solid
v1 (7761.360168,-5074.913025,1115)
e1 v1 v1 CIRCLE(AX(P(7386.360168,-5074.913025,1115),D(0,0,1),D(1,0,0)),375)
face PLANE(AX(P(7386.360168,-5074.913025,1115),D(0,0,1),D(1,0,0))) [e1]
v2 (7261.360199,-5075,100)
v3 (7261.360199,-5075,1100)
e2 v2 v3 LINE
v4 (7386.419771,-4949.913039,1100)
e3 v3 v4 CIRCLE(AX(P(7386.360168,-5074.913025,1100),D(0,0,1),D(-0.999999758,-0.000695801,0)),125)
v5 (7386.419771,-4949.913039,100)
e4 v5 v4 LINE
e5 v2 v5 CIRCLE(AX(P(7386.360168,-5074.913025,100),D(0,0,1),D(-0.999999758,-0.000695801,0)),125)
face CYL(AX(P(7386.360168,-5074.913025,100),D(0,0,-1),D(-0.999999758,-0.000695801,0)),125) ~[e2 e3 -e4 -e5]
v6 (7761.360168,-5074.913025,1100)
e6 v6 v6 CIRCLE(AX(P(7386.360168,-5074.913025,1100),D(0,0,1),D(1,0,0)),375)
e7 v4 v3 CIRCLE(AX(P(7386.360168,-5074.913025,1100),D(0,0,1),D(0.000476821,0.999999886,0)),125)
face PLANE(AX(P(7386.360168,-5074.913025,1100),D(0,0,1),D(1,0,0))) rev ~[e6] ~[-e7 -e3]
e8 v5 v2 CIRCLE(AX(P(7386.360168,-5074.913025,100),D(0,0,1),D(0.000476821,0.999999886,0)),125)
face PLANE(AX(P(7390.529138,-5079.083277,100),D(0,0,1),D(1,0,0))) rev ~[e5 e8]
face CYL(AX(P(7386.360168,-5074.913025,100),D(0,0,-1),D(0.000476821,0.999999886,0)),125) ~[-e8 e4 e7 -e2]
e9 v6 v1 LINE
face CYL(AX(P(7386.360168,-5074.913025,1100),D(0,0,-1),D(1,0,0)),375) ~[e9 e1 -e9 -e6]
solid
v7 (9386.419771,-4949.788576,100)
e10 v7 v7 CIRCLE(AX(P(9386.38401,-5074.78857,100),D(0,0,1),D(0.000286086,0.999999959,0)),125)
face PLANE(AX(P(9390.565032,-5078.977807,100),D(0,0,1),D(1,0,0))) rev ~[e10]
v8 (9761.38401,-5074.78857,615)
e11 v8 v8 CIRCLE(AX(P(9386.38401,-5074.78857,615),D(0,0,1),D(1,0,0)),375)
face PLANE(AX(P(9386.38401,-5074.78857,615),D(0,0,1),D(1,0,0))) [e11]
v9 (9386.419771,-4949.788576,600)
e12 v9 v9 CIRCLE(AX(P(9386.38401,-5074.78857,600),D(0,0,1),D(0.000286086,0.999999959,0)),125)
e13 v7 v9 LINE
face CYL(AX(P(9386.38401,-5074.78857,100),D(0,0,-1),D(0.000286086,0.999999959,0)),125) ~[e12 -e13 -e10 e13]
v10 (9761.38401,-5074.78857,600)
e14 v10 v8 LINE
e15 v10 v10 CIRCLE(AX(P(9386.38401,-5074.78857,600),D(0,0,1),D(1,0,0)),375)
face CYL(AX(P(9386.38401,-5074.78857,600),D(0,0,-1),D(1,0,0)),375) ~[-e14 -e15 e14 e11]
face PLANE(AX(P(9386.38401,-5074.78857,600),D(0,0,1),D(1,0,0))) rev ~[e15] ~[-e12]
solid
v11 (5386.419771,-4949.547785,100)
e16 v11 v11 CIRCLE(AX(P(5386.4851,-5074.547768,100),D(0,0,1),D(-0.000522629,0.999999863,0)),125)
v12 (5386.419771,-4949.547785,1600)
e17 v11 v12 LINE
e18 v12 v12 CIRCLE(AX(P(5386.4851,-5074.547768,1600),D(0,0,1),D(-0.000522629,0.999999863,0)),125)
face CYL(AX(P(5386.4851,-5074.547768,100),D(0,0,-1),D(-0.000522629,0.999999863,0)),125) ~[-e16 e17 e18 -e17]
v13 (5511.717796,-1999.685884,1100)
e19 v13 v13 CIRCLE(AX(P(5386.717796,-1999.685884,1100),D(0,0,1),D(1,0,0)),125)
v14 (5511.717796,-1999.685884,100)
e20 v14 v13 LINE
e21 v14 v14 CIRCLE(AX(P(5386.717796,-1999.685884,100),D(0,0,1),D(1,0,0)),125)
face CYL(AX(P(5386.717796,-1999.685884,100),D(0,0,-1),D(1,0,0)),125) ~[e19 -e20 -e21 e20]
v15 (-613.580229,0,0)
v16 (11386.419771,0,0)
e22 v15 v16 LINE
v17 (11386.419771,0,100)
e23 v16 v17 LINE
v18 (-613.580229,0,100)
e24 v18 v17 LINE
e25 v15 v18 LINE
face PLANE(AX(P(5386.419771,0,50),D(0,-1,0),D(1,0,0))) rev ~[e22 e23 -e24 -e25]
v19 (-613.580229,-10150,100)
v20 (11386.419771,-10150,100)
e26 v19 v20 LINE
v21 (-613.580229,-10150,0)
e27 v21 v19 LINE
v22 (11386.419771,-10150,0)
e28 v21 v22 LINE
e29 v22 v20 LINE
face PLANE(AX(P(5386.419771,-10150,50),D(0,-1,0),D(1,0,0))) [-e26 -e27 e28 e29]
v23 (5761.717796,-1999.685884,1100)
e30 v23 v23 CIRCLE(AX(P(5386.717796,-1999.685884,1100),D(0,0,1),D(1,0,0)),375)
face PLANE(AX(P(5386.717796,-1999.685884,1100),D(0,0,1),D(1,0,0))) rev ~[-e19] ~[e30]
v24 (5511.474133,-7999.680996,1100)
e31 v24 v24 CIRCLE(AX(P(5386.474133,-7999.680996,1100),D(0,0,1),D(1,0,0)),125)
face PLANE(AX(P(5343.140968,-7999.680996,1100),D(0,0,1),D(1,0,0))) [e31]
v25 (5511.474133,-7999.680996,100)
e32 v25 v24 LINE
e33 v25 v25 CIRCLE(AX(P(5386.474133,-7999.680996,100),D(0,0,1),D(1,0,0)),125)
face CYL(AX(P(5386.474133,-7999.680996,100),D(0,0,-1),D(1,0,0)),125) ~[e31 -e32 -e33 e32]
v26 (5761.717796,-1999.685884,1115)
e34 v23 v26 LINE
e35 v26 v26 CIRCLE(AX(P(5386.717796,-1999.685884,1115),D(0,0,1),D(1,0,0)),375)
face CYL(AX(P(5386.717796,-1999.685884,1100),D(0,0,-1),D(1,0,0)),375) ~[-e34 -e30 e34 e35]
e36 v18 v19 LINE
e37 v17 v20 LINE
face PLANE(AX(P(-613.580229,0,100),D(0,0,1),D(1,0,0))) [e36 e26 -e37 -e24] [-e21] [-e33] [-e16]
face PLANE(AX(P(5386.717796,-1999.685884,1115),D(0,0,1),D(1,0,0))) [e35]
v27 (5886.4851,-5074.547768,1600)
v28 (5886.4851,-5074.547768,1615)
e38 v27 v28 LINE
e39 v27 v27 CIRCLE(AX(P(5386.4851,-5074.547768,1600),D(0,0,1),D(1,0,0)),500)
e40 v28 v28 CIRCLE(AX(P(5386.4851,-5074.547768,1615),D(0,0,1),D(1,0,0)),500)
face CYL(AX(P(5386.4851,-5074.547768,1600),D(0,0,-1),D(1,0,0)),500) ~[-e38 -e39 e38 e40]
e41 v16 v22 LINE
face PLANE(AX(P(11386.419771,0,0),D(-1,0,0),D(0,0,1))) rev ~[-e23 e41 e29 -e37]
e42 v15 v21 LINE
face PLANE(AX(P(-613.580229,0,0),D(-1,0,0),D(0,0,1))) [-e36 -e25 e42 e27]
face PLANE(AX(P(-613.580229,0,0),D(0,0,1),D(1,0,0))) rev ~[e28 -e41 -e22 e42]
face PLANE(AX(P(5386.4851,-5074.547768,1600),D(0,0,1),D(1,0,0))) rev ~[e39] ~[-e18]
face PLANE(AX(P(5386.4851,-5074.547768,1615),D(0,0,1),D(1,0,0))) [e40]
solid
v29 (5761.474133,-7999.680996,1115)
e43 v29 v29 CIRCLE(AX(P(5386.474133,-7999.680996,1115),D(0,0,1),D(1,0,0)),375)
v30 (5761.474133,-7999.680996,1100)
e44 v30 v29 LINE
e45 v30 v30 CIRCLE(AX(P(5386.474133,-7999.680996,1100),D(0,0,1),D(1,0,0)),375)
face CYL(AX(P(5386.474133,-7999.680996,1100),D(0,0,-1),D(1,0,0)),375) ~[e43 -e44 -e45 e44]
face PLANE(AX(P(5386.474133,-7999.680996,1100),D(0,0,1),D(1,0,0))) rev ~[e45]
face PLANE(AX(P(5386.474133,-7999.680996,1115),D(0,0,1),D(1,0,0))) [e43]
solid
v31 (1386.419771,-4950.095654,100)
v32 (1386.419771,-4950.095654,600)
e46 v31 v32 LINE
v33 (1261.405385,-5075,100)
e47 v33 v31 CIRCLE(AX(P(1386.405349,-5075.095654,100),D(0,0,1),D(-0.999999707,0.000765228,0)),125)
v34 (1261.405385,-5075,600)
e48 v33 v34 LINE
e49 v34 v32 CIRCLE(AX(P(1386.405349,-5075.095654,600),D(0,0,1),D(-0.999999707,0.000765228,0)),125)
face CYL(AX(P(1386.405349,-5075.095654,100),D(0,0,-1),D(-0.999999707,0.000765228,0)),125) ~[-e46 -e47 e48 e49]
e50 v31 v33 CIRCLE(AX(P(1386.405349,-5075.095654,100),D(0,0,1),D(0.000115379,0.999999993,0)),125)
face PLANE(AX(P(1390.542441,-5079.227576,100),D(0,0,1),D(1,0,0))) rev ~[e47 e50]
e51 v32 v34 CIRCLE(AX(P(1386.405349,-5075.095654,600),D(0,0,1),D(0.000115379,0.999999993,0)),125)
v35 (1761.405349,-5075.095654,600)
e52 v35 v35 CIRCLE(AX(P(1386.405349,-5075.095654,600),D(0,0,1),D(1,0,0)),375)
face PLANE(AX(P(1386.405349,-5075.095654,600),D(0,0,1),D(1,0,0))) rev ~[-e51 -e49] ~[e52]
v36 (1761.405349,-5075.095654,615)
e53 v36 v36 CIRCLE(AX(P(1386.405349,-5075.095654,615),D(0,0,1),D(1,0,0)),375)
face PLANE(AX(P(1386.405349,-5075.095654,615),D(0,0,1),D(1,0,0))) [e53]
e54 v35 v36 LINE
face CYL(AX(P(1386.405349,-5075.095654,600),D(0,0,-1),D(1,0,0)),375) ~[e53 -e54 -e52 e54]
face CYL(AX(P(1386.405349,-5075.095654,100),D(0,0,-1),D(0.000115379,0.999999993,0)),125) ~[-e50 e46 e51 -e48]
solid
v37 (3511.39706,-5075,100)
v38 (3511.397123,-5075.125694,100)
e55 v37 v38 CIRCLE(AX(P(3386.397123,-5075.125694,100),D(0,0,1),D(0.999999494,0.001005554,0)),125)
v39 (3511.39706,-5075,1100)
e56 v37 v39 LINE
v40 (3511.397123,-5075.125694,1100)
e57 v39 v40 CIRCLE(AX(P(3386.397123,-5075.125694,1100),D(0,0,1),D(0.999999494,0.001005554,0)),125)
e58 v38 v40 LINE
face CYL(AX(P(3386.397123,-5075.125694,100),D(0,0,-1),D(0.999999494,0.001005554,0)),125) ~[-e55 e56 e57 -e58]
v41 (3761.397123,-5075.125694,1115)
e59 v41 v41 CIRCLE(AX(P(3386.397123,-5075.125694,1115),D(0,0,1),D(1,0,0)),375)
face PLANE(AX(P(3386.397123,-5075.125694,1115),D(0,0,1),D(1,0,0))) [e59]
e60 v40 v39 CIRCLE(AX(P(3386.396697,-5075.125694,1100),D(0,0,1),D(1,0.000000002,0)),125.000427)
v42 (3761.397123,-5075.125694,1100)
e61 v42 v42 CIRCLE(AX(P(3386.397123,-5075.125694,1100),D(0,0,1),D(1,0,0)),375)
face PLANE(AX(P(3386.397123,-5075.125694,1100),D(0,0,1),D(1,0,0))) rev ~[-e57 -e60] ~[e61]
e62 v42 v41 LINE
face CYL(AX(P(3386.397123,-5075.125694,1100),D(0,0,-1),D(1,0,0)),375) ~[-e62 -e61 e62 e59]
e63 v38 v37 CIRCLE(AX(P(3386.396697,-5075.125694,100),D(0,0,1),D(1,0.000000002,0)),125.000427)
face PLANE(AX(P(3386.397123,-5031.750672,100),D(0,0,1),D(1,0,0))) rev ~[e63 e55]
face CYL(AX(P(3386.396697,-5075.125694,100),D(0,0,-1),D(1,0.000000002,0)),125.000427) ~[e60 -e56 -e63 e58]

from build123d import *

# Parameters (mm, degrees)
F0_W      = 12000
F0_H      = 100
F1_DEPTH  = 10150
F10_DEPTH = 1500
F11_DEPTH = 500
F12_DEPTH = 1000
F16_DEPTH = 1000
F17_R     = 375
F17_R_2   = 125
F18_DEPTH = 15
F19_R     = 500
F19_R_2   = 125
F20_DEPTH = 15
F21_R     = 375
F21_R_2   = 125
F22_DEPTH = 15
F23_R     = 375
F23_R_2   = 125
F24_DEPTH = 15
F25_R     = 375
F26_DEPTH = 15
F27_R     = 375
F27_R_2   = 125
F28_DEPTH = 15
F29_R     = 375
F29_R_2   = 125
F30_DEPTH = 15


with BuildPart() as f1:
    # F0 (on Front) → F1 (new body)
    with BuildSketch(Plane.XZ):
        with Locations((5386.4197711137, 50)):
            Rectangle(F0_W, F0_H)
    extrude(amount=F1_DEPTH)

    # F3 (on face) → F10 (join)
    with BuildSketch(Plane.XY.offset(100)):
        with BuildLine():
            ThreePointArc((5261.4859178516, -5075), (5386.7112163429, -5199.5475631242), (5511.4850997925, -5074.5477676392))
            ThreePointArc((5511.4850997925, -5074.5477676392), (5474.8503472463, -4986.136325832), (5386.4197711137, -4949.5477847105))
            Line((5386.4197711137, -4949.5477847105), (5386.4197711137, -5075))
            Line((5386.4197711137, -5075), (5261.4859178516, -5075))
        make_face()
        with BuildLine():
            Line((5386.4197711137, -5075), (5386.4197711137, -4949.5477847105))
            ThreePointArc((5386.4197711137, -4949.5477847105), (5297.9139558776, -4986.3425950833), (5261.4859178516, -5075))
            Line((5261.4859178516, -5075), (5386.4197711137, -5075))
        make_face()
    extrude(amount=F10_DEPTH)

    # F14 (on face) + F15 (on face) → F16 (join)
    with BuildSketch(Plane.XY.offset(100)):
        with BuildLine():
            Line((5386.4197711137, -2124.6855282454), (5386.4197711137, -1874.6862387986))
            ThreePointArc((5386.4197711137, -1874.6862387986), (5261.7177963257, -1999.685883522), (5386.4197711137, -2124.6855282454))
        make_face()
        with BuildLine():
            ThreePointArc((5386.4197711137, -2124.6855282454), (5475.0007132703, -2088.1795362647), (5511.7177963257, -1999.685883522))
            ThreePointArc((5511.7177963257, -1999.685883522), (5475.0007132703, -1911.1922307793), (5386.4197711137, -1874.6862387986))
            Line((5386.4197711137, -1874.6862387986), (5386.4197711137, -2124.6855282454))
        make_face()
    with BuildSketch(Plane.XY.offset(100)):
        with BuildLine():
            Line((5386.4197711137, -8124.6809841205), (5386.4197711137, -7874.6810077618))
            ThreePointArc((5386.4197711137, -7874.6810077618), (5261.4741325378, -7999.6809959412), (5386.4197711137, -8124.6809841205))
        make_face()
        with BuildLine():
            ThreePointArc((5386.4197711137, -8124.6809841205), (5474.8432584303, -8088.0885611661), (5511.4741325378, -7999.6809959412))
            ThreePointArc((5511.4741325378, -7999.6809959412), (5474.8432584303, -7911.2734307162), (5386.4197711137, -7874.6810077618))
            Line((5386.4197711137, -7874.6810077618), (5386.4197711137, -8124.6809841205))
        make_face()
    extrude(amount=F16_DEPTH)

    # F17 (on face) → F18 (join)
    with BuildSketch(Plane.XY.offset(1100)):
        with Locations((5386.7177963257, -1999.685883522)):
            Circle(F17_R)
        with Locations((5386.7177963257, -1999.685883522)):
            Circle(F17_R_2, mode=Mode.SUBTRACT)
        with Locations((5386.7177963257, -1999.685883522)):
            Circle(F17_R_2)
    extrude(amount=F18_DEPTH)

    # F19 (on face) → F20 (join)
    with BuildSketch(Plane.XY.offset(1600)):
        with Locations((5386.4850997925, -5074.5477676392)):
            Circle(F19_R)
        with Locations((5386.4850997925, -5074.5477676392)):
            Circle(F19_R_2, mode=Mode.SUBTRACT)
        with Locations((5386.4850997925, -5074.5477676392)):
            Circle(F19_R_2)
    extrude(amount=F20_DEPTH)


with BuildPart() as f11:
    # F9 (on face) → F11 (new body)
    with BuildSketch(Plane.XY.offset(100)):
        with BuildLine():
            ThreePointArc((1261.4053853762, -5075), (1386.3575220073, -5200.0956443843), (1511.4053487778, -5075.0956535339))
            ThreePointArc((1511.4053487778, -5075.0956535339), (1474.7987953448, -4986.7124050985), (1386.4197711137, -4950.095654366))
            Line((1386.4197711137, -4950.095654366), (1386.4197711137, -5075))
            Line((1386.4197711137, -5075), (1261.4053853762, -5075))
        make_face()
        with BuildLine():
            Line((1386.4197711137, -5075), (1386.4197711137, -4950.095654366))
            ThreePointArc((1386.4197711137, -4950.095654366), (1298.0559273963, -4986.6683967543), (1261.4053853762, -5075))
            Line((1261.4053853762, -5075), (1386.4197711137, -5075))
        make_face()
    extrude(amount=F11_DEPTH)

    # F23 (on face) → F24 (join)
    with BuildSketch(Plane.XY.offset(600)):
        with Locations((1386.4053487778, -5075.0956535339)):
            Circle(F23_R)
        with Locations((1386.4053487778, -5075.0956535339)):
            Circle(F23_R_2, mode=Mode.SUBTRACT)
        with Locations((1386.4053487778, -5075.0956535339)):
            Circle(F23_R_2)
    extrude(amount=F24_DEPTH)


with BuildPart() as f11b:
    # F7 (on face) → F11, piece 2 (new body)
    with BuildSketch(Plane.XY.offset(100)):
        with BuildLine():
            ThreePointArc((9261.384189125, -5075), (9386.4897251507, -5199.7885257015), (9511.3840103149, -5074.7885704041))
            ThreePointArc((9511.3840103149, -5074.7885704041), (9474.7850004108, -4986.4128670118), (9386.4197711137, -4949.7885755194))
            Line((9386.4197711137, -4949.7885755194), (9386.4197711137, -5075))
            Line((9386.4197711137, -5075), (9261.384189125, -5075))
        make_face()
        with BuildLine():
            Line((9386.4197711137, -5075), (9386.4197711137, -4949.7885755194))
            ThreePointArc((9386.4197711137, -4949.7885755194), (9297.9335761584, -4986.462352906), (9261.384189125, -5075))
            Line((9261.384189125, -5075), (9386.4197711137, -5075))
        make_face()
    extrude(amount=F11_DEPTH)

    # F29 (on face) → F30 (join)
    with BuildSketch(Plane.XY.offset(600)):
        with Locations((9386.3840103149, -5074.7885704041)):
            Circle(F29_R)
        with Locations((9386.3840103149, -5074.7885704041)):
            Circle(F29_R_2, mode=Mode.SUBTRACT)
        with Locations((9386.3840103149, -5074.7885704041)):
            Circle(F29_R_2)
    extrude(amount=F30_DEPTH)


with BuildPart() as f12:
    # F8 (on face) → F12 (new body)
    with BuildSketch(Plane.XY.offset(100)):
        with BuildLine():
            Line((3261.397186533, -5075), (3511.3970601406, -5075))
            ThreePointArc((3511.3970601406, -5075), (3386.3971233368, -4950.1256942749), (3261.397186533, -5075))
        make_face()
        with BuildLine():
            ThreePointArc((3261.397186533, -5075), (3386.3342761914, -5200.1256784758), (3511.3971233368, -5075.1256942749))
            ThreePointArc((3511.3971233368, -5075.1256942749), (3511.3971075377, -5075.0628471295), (3511.3970601406, -5075))
            Line((3511.3970601406, -5075), (3261.397186533, -5075))
        make_face()
    extrude(amount=F12_DEPTH)

    # F25 (on face) → F26 (join)
    with BuildSketch(Plane.XY.offset(1100)):
        with Locations((3386.3971233368, -5075.1256942749)):
            Circle(F25_R)
        with BuildLine():
            ThreePointArc((3511.3971233368, -5075.1256942749), (3261.3971391358, -5075.1885414211), (3511.3970601406, -5075))
            ThreePointArc((3511.3970601406, -5075), (3511.3971075377, -5075.0628471295), (3511.3971233368, -5075.1256942749))
        make_face(mode=Mode.SUBTRACT)
        with BuildLine():
            ThreePointArc((3511.3971233368, -5075.1256942749), (3511.3971075377, -5075.0628471295), (3511.3970601406, -5075))
            ThreePointArc((3511.3970601406, -5075), (3261.3971391358, -5075.1885414211), (3511.3971233368, -5075.1256942749))
        make_face()
    extrude(amount=F26_DEPTH)


with BuildPart() as f12b:
    # F6 (on face) → F12, piece 2 (new body)
    with BuildSketch(Plane.XY.offset(100)):
        with BuildLine():
            ThreePointArc((7261.3601987157, -5075), (7386.4036560085, -5199.9130173377), (7511.360168457, -5074.9130249023))
            ThreePointArc((7511.360168457, -5074.9130249023), (7474.7695863153, -4986.545752488), (7386.4197711137, -4949.9130391123))
            Line((7386.4197711137, -4949.9130391123), (7386.4197711137, -5075))
            Line((7386.4197711137, -5075), (7261.3601987157, -5075))
        make_face()
        with BuildLine():
            Line((7386.4197711137, -5075), (7386.4197711137, -4949.9130391123))
            ThreePointArc((7386.4197711137, -4949.9130391123), (7297.9621437175, -4986.5343554048), (7261.3601987157, -5075))
            Line((7261.3601987157, -5075), (7386.4197711137, -5075))
        make_face()
    extrude(amount=F12_DEPTH)

    # F27 (on face) → F28 (join)
    with BuildSketch(Plane.XY.offset(1100)):
        with Locations((7386.360168457, -5074.9130249023)):
            Circle(F27_R)
        with Locations((7386.360168457, -5074.9130249023)):
            Circle(F27_R_2, mode=Mode.SUBTRACT)
        with Locations((7386.360168457, -5074.9130249023)):
            Circle(F27_R_2)
    extrude(amount=F28_DEPTH)


with BuildPart() as f22:
    # F21 (on face) → F22 (new body)
    with BuildSketch(Plane.XY.offset(1100)):
        with Locations((5386.4741325378, -7999.6809959412)):
            Circle(F21_R)
        with Locations((5386.4741325378, -7999.6809959412)):
            Circle(F21_R_2, mode=Mode.SUBTRACT)
        with Locations((5386.4741325378, -7999.6809959412)):
            Circle(F21_R_2)
    extrude(amount=F22_DEPTH)


solid = Compound([f1.part, f11.part, f11b.part, f12.part, f12b.part, f22.part])
